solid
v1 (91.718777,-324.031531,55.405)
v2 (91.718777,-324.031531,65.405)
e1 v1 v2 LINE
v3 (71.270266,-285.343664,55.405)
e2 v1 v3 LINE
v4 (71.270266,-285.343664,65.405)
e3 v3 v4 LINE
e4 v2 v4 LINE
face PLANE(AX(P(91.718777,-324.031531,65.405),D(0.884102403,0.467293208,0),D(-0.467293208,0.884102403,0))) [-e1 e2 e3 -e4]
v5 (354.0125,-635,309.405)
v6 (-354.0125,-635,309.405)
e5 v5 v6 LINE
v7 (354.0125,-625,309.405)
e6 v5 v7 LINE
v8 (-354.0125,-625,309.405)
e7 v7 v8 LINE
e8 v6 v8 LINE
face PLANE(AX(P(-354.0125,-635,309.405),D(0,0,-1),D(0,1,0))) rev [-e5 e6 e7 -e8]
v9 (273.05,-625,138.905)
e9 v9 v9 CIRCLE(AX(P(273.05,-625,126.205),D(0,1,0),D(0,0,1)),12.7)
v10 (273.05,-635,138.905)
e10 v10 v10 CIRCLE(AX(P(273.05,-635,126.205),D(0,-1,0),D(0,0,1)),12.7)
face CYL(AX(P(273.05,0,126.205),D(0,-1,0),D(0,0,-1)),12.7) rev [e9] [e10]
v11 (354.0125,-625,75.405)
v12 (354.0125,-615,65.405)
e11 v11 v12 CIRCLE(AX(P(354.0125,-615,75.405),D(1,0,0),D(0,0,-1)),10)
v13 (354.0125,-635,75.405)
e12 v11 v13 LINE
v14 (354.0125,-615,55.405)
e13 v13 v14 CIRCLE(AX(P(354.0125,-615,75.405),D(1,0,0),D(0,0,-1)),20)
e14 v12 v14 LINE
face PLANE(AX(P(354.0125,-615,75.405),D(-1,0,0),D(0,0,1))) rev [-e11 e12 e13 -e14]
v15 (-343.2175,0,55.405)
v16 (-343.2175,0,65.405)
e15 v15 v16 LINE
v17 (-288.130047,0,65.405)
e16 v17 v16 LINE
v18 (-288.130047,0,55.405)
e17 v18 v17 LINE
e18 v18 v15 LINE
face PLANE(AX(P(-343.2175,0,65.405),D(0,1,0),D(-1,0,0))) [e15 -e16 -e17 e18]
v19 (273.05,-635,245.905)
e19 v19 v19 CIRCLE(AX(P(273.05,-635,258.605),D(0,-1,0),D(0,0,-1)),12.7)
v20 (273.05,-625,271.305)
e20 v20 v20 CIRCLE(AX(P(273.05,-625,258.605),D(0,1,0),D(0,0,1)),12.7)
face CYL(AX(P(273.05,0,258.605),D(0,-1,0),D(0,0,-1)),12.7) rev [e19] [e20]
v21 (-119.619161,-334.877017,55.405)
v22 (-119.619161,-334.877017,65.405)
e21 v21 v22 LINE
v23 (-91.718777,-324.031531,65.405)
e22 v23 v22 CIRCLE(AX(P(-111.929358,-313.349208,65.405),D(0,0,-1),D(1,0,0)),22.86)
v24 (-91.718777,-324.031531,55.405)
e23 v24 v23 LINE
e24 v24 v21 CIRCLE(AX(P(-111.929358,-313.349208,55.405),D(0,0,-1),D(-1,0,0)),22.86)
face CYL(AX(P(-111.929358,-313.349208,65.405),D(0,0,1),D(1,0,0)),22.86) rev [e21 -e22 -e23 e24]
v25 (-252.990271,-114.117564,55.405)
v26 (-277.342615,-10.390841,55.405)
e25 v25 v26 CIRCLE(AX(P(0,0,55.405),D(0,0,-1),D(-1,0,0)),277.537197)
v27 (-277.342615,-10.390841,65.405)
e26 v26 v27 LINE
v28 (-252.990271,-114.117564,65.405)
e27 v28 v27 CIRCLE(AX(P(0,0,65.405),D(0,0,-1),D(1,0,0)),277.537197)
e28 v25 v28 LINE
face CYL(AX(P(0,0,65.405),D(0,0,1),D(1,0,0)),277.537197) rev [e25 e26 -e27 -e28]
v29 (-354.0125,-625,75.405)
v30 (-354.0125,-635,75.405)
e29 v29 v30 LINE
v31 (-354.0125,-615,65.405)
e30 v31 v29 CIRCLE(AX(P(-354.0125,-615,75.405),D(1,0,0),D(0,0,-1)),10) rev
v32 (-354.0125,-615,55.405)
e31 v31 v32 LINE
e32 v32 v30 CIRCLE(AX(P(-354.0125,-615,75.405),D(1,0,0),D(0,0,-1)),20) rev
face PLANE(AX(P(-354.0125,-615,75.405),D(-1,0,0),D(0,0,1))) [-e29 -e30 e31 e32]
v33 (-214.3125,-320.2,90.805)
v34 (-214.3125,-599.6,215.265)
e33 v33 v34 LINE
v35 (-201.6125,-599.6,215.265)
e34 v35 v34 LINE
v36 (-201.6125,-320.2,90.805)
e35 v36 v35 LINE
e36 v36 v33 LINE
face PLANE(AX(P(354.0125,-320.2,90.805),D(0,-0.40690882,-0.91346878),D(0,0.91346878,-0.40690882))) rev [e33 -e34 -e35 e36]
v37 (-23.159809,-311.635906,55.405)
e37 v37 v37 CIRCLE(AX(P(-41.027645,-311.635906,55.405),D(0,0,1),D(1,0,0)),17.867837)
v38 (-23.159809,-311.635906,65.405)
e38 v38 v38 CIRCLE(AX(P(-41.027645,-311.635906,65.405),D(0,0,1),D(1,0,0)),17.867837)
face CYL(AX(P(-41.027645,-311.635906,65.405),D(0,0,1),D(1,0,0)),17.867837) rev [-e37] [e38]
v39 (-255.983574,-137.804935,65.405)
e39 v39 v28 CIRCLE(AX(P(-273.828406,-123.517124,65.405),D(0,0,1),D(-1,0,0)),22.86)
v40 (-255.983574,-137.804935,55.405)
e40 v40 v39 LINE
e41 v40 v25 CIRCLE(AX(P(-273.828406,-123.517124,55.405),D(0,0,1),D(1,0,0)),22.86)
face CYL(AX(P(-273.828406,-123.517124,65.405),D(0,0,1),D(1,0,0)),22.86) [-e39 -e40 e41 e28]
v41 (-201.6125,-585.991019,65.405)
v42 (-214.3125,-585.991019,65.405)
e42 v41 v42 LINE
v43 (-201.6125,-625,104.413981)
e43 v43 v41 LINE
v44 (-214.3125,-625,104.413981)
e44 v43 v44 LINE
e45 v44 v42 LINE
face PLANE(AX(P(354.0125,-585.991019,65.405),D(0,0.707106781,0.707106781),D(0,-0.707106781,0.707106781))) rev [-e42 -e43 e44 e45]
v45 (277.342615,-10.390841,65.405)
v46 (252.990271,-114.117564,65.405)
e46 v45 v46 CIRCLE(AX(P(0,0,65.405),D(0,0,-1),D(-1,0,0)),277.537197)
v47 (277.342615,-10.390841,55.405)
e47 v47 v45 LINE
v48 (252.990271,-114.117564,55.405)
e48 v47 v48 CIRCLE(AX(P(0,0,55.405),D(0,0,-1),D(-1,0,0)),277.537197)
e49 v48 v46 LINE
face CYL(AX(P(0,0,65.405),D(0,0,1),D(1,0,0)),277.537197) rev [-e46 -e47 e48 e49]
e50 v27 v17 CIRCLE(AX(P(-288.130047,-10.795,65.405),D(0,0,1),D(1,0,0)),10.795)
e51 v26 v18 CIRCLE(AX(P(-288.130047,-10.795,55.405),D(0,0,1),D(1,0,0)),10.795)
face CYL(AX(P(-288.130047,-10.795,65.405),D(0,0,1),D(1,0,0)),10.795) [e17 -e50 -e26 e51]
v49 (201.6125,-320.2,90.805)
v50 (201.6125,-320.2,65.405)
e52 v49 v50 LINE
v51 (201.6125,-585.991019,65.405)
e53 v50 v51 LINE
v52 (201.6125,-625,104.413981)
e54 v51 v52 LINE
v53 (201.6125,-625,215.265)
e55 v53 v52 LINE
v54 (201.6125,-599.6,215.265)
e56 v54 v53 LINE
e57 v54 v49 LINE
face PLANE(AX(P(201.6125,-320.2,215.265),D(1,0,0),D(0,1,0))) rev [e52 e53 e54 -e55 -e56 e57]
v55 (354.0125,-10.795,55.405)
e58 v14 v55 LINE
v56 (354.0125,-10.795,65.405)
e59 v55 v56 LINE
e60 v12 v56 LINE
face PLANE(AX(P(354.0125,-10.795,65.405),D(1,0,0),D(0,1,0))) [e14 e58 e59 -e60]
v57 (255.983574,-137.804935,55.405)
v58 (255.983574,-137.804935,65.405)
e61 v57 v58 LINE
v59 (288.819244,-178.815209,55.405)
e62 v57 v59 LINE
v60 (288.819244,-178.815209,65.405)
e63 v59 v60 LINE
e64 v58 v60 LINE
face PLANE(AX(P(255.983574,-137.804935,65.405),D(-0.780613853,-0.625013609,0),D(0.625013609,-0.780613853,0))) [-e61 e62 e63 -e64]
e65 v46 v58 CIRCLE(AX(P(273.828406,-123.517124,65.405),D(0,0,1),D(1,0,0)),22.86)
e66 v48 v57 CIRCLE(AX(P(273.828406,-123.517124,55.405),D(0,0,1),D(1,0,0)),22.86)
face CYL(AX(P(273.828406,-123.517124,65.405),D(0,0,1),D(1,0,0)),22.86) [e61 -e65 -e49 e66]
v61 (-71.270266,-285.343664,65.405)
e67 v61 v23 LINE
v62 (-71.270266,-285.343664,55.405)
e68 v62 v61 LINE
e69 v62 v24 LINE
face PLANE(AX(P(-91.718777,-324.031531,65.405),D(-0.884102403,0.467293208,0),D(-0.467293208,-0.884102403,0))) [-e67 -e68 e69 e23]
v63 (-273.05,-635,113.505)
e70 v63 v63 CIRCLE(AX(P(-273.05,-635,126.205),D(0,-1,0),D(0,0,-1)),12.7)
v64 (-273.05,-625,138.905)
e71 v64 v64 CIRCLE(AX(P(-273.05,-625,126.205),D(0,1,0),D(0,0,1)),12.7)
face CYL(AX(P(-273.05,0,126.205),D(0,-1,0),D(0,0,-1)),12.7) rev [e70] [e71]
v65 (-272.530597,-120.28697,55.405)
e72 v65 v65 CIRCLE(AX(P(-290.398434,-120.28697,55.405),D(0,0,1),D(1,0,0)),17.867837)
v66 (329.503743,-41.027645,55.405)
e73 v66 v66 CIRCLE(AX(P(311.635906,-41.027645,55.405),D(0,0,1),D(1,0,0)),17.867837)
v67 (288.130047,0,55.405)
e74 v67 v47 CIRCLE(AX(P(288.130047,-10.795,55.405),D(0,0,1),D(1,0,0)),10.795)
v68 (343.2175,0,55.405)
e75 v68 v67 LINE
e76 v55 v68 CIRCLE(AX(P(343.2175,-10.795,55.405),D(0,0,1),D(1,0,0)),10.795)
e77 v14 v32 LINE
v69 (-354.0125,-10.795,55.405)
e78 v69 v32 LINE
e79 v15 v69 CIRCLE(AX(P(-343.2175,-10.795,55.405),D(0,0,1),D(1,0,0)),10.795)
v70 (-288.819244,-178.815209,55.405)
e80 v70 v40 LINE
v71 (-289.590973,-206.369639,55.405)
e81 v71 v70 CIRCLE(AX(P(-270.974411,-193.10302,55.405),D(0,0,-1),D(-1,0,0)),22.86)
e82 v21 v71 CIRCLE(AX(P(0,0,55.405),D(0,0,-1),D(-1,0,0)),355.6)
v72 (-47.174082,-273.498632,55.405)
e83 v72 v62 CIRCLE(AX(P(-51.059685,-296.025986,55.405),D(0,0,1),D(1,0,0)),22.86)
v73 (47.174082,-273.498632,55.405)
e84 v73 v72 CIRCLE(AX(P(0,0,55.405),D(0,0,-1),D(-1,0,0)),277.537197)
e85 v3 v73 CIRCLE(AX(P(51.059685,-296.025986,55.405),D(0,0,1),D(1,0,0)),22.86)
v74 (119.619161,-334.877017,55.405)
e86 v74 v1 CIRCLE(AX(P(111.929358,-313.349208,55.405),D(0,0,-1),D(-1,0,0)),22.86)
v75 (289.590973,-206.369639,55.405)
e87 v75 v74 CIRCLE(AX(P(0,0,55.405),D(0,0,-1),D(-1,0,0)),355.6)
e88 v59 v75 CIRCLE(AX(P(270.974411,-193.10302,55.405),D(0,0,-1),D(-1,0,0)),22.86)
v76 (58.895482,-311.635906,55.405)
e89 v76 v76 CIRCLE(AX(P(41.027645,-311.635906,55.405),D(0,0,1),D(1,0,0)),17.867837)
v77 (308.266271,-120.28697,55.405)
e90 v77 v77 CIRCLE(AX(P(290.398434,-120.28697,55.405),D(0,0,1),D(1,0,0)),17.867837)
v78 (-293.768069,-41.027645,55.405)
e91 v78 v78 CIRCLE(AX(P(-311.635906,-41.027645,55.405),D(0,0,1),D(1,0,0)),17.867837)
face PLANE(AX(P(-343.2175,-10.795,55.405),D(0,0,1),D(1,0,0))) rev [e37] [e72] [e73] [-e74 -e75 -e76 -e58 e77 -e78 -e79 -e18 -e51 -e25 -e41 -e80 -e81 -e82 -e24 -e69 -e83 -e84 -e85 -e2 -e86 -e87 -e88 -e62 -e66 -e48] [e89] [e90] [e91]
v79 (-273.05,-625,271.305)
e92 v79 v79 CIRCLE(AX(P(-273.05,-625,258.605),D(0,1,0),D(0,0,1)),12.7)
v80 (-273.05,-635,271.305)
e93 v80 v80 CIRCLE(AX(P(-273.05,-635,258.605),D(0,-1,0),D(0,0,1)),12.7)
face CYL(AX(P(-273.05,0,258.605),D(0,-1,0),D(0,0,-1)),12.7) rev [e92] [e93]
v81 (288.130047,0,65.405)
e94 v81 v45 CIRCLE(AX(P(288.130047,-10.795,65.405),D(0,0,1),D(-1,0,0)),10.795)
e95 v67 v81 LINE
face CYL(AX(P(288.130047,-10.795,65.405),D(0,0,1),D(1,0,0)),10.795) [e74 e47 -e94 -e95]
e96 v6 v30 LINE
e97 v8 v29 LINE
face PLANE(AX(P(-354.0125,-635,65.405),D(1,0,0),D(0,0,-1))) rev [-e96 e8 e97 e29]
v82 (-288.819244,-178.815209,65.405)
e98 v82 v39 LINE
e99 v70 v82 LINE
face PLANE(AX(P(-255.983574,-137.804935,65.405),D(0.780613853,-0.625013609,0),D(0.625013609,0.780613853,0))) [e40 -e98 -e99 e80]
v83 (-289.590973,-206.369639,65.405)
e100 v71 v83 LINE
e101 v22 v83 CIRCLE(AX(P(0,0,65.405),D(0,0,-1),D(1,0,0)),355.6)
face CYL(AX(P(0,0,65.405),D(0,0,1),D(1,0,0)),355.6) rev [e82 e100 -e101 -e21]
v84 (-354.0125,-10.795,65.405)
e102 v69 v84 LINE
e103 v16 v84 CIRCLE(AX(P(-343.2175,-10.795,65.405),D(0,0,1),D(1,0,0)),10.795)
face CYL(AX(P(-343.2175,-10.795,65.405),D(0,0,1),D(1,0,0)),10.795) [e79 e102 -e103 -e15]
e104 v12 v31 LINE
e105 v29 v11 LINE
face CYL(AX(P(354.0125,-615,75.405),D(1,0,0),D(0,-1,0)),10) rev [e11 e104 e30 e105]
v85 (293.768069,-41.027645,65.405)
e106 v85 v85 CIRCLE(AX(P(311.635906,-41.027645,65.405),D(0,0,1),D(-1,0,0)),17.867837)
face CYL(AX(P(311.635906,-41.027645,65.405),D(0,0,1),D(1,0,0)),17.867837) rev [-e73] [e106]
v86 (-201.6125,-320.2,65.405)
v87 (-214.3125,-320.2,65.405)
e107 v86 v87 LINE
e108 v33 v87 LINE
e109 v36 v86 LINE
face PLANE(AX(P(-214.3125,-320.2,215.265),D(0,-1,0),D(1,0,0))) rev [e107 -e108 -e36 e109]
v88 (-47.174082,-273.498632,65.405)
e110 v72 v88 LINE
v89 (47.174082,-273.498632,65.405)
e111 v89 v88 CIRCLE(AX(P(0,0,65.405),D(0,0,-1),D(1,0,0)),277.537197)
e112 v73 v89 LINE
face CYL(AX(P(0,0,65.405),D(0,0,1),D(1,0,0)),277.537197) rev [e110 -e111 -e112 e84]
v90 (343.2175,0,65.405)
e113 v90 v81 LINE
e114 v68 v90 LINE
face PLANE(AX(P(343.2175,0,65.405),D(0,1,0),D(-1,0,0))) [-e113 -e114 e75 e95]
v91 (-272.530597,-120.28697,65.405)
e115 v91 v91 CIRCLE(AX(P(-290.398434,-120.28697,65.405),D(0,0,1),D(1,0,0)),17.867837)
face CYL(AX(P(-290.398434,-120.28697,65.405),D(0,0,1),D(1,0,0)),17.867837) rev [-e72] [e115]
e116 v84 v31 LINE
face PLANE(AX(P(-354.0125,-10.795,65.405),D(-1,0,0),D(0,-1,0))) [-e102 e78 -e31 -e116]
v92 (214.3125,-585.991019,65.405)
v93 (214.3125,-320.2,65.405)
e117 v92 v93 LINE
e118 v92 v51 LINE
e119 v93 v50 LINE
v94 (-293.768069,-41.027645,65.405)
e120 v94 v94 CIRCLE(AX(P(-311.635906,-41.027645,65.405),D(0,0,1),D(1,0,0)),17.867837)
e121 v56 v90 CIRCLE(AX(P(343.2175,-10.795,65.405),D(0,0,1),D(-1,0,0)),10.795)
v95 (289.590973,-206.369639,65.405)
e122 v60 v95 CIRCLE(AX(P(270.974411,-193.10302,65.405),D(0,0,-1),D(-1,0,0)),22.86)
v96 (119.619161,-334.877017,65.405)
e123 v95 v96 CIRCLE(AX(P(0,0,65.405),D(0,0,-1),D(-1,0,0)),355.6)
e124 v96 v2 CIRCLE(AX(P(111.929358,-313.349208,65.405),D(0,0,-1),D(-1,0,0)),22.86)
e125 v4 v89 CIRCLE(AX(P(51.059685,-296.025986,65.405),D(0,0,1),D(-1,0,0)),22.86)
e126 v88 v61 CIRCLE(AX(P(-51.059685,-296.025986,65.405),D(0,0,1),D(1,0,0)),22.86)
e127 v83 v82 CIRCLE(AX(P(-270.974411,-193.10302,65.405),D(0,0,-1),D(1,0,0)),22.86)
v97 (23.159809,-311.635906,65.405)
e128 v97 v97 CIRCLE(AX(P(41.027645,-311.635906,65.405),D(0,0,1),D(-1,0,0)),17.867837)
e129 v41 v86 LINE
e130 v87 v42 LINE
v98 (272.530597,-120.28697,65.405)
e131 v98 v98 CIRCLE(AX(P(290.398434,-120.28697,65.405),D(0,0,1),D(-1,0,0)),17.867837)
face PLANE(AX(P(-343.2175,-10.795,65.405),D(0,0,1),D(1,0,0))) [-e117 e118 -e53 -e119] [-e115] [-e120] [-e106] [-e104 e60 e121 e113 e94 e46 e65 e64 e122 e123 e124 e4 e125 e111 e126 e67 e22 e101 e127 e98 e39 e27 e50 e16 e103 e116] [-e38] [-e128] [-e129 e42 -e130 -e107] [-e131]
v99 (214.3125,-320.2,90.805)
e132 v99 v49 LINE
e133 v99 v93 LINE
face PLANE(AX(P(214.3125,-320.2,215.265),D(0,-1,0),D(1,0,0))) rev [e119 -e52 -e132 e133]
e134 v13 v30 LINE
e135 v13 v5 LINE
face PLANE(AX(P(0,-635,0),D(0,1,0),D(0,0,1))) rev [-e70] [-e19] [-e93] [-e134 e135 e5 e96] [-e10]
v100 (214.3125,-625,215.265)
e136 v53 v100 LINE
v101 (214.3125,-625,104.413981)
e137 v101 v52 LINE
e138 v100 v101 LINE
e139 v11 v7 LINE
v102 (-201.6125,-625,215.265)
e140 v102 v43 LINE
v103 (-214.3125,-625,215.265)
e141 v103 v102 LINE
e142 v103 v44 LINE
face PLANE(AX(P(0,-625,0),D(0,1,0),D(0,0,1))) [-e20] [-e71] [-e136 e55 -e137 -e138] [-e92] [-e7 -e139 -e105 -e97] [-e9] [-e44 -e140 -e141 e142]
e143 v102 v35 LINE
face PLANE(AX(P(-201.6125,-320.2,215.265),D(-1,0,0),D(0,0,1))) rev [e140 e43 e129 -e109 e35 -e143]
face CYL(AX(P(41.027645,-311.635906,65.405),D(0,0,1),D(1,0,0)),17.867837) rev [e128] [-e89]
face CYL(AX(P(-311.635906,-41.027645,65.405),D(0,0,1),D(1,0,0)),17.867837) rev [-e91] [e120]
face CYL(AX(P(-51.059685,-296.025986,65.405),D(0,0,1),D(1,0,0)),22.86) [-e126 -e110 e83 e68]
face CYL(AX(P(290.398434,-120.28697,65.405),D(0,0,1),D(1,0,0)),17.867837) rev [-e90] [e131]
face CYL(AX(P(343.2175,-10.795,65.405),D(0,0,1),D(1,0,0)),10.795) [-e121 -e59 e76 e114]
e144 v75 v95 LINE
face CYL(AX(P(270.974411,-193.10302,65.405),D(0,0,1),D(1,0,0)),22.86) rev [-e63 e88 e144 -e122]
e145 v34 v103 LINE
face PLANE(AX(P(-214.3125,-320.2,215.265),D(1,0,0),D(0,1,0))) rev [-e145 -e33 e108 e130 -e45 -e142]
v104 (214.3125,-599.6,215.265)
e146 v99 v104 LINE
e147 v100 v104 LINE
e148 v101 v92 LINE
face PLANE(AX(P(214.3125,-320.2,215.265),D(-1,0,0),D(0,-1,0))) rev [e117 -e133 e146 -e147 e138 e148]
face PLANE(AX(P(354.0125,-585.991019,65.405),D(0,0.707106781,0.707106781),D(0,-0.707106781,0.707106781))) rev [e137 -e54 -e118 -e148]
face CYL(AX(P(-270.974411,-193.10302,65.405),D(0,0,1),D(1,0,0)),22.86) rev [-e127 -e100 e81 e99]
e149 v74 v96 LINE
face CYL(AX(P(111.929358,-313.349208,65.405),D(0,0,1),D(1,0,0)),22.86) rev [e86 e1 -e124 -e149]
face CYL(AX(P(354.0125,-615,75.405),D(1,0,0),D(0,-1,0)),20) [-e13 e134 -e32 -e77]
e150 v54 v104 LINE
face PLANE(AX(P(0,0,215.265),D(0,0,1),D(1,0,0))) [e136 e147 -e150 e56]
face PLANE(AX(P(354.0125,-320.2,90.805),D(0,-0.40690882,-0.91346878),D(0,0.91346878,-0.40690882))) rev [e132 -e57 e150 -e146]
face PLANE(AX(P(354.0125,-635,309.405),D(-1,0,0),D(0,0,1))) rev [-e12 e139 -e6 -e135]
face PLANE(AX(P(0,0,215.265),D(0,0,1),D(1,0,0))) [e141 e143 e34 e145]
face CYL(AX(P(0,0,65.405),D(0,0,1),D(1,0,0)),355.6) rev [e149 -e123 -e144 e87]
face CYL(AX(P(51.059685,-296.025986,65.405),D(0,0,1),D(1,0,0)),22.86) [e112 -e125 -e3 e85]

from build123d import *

# Parameters (mm, degrees)
SKETCH1_R                    = 355.6
BOSS_EXTRUDE1_DEPTH          = 60.325
SKETCH2_R                    = 17.4625
BOLTHOLE_DEPTH               = 507.499581071
BOLTHOLEPATTERN_COUNT        = 24
SKETCH5_OUTSIDE_W            = 914.72
SKETCH5_OUTSIDE_H            = 914.72
SKETCH5_OUTSIDE_R            = 266.7
RAISED_FACE_DEPTH            = 1.5875
FILLET2_R                    = 1.5875
FILLET3_R                    = 1.5875
SKETCH11_R                   = 230.886
CUT_EXTRUDE5_DEPTH           = 507.499581211
SKETCH12_R                   = 17.867836571
BOSS_EXTRUDE2_DEPTH          = 5.08
CONVERT_SOLID1_OUTLINE_R     = 355.6
CONVERT_SOLID1_OUTLINE_R_2   = 17.4625
CONVERT_SOLID1_OUTLINE_R_3   = 230.886
CONVERT_SOLID1_DEPTH         = 55.405
CONVERT_SOLID1_START         = 55.405
CONVERT_SOLID1_2_OUTLINE_R   = 17.4625
CONVERT_SOLID1_2_OUTLINE_R_2 = 230.886
CONVERT_SOLID1_2_OUTLINE_R_3 = 17.867836571
CONVERT_SOLID1_2_DEPTH       = 4.92
CONVERT_SOLID1_3_OUTLINE_R   = 17.867836571
CONVERT_SOLID1_3_DEPTH       = 4.92
EDGE_FLANGE1_STRIP_W         = 60
EDGE_FLANGE1_STRIP_H         = 10
EDGE_FLANGE1_STRIP_CUT_DEPTH = 708.025
EDGE_FLANGE1_DEPTH           = 708.025
SKETCH21_R                   = 12.7
CUT_EXTRUDE6_DEPTH           = 791.114741274
SKETCH22_W                   = 12.7
SKETCH22_H                   = 304.8
BOSS_EXTRUDE3_DEPTH          = 149.86
CUT_EXTRUDE12_DEPTH          = 907.614449346


# Read off the part's stored shape, not the designer's step: Convert-Solid1
# Sheet-metal steps are written as plain solids
with BuildPart() as part:
    # Sketch1 → Boss-Extrude1 (new body)
    with BuildSketch(Plane.XY):
        with Locations(Location((0, 0, 0), (0, 0, 180))):
            Circle(SKETCH1_R)
    extrude(amount=BOSS_EXTRUDE1_DEPTH)

    # Sketch2 → BoltHole (cut, through all)
    with BuildSketch(Plane.XY):
        with Locations(Location((41.02764537, 311.635906051, 0), (0, 0, 180))):
            Circle(SKETCH2_R)
    bolthole = extrude(amount=BOLTHOLE_DEPTH, mode=Mode.SUBTRACT)

    # BoltHolePattern: BoltHole ×24 about axis
    boltholepattern_axis = Axis((0, 0, 0), (0, 0, 1))
    for i in range(1, BOLTHOLEPATTERN_COUNT):
        add(bolthole.rotate(boltholepattern_axis, i * 360 / BOLTHOLEPATTERN_COUNT), mode=Mode.SUBTRACT)

    # Sketch5 outside → Raised Face (cut)
    with BuildSketch(Plane(origin=(0, 0, 0), x_dir=(-1, 0, 0), z_dir=(0, 0, -1))):
        Rectangle(SKETCH5_OUTSIDE_W, SKETCH5_OUTSIDE_H)
        Circle(SKETCH5_OUTSIDE_R, mode=Mode.SUBTRACT)
    extrude(amount=-RAISED_FACE_DEPTH, mode=Mode.SUBTRACT)

    # Fillet2
    fillet2_edges = [part.edges().sort_by_distance(p)[0] for p in [
        (355.6, 0, 1.5875),
        (355.6, 0, 60.325),
    ]]
    fillet(fillet2_edges, radius=FILLET2_R)

    # Fillet3
    fillet3_edges = [part.edges().sort_by_distance(p)[0] for p in [
        (266.7, 0, 1.5875),
    ]]
    fillet(fillet3_edges, radius=FILLET3_R - 0.0001)  # a hair under: the kernel refuses the full size

    # Sketch11 → Cut-Extrude5 (cut, through all)
    with BuildSketch(Plane.XY):
        with Locations(Location((0, 0, 0), (0, 0, 180))):
            Circle(SKETCH11_R)
    extrude(amount=CUT_EXTRUDE5_DEPTH, mode=Mode.SUBTRACT)

    # Sketch12 → Boss-Extrude2 (add)
    with BuildSketch(Plane.XY.offset(60.325)):
        with BuildLine():
            Line((-343.2175, 0), (-288.130046772, 0))
            ThreePointArc((-288.130046772, 0), (-280.641083905, -3.020203528), (-277.342615169, -10.390841095))
            ThreePointArc((-277.342615169, -10.390841095), (-270.190767513, -63.433783731), (-252.99027113, -114.117564297))
            ThreePointArc((-252.99027113, -114.117564297), (-251.148770275, -126.38308213), (-255.983573502, -137.804935346))
            Line((-255.983573502, -137.804935346), (-288.819243573, -178.81520867))
            ThreePointArc((-288.819243573, -178.81520867), (-293.825450252, -192.463019981), (-289.590973462, -206.369639456))
            ThreePointArc((-289.590973462, -206.369639456), (-214.456918936, -283.653996835), (-119.619161223, -334.877016632))
            ThreePointArc((-119.619161223, -334.877016632), (-103.646930374, -334.656038137), (-91.71877708, -324.031531146))
            Line((-91.71877708, -324.031531146), (-71.270266052, -285.343663587))
            ThreePointArc((-71.270266052, -285.343663587), (-61.144446621, -275.510694804), (-47.174081625, -273.498632154))
            ThreePointArc((-47.174081625, -273.498632154), (0, -277.537197088), (47.174081625, -273.498632154))
            ThreePointArc((47.174081625, -273.498632154), (61.144446621, -275.510694804), (71.270266052, -285.343663587))
            Line((71.270266052, -285.343663587), (91.71877708, -324.031531146))
            ThreePointArc((91.71877708, -324.031531146), (103.646930374, -334.656038137), (119.619161223, -334.877016632))
            ThreePointArc((119.619161223, -334.877016632), (214.456918936, -283.653996835), (289.590973462, -206.369639456))
            ThreePointArc((289.590973462, -206.369639456), (293.825450252, -192.463019981), (288.819243573, -178.81520867))
            Line((288.819243573, -178.81520867), (255.983573502, -137.804935346))
            ThreePointArc((255.983573502, -137.804935346), (251.148770275, -126.38308213), (252.99027113, -114.117564297))
            ThreePointArc((252.99027113, -114.117564297), (270.190767513, -63.433783731), (277.342615169, -10.390841095))
            ThreePointArc((277.342615169, -10.390841095), (280.641083905, -3.020203528), (288.130046772, 0))
            Line((288.130046772, 0), (343.2175, 0))
            ThreePointArc((343.2175, 0), (350.850717703, -3.161782297), (354.0125, -10.795))
            Line((354.0125, -10.795), (354.0125, -635))
            Line((354.0125, -635), (-354.0125, -635))
            Line((-354.0125, -635), (-354.0125, -10.795))
            ThreePointArc((-354.0125, -10.795), (-350.850717703, -3.161782297), (-343.2175, 0))
        make_face()
        with Locations((-311.635906051, -41.02764537)):
            Circle(SKETCH12_R, mode=Mode.SUBTRACT)
        with Locations((-290.398434057, -120.286969878)):
            Circle(SKETCH12_R, mode=Mode.SUBTRACT)
        with Locations((-41.02764537, -311.635906051)):
            Circle(SKETCH12_R, mode=Mode.SUBTRACT)
        with Locations(Location((41.02764537, -311.635906051, 0), (0, 0, 180))):
            Circle(SKETCH12_R, mode=Mode.SUBTRACT)
        with Locations(Location((290.398434057, -120.286969878, 0), (0, 0, 180))):
            Circle(SKETCH12_R, mode=Mode.SUBTRACT)
        with Locations(Location((311.635906051, -41.02764537, 0), (0, 0, 180))):
            Circle(SKETCH12_R, mode=Mode.SUBTRACT)
    extrude(amount=BOSS_EXTRUDE2_DEPTH)

    # Convert-Solid1 outline → Convert-Solid1 (cut)
    with BuildSketch(Plane.XY):
        Circle(CONVERT_SOLID1_OUTLINE_R)
        with Locations((-41.02764537, 311.635906051)):
            Circle(CONVERT_SOLID1_OUTLINE_R_2, mode=Mode.SUBTRACT)
        Circle(CONVERT_SOLID1_OUTLINE_R_3, mode=Mode.SUBTRACT)
        with Locations((311.635906051, 41.02764537)):
            Circle(CONVERT_SOLID1_OUTLINE_R_2, mode=Mode.SUBTRACT)
        with Locations((41.02764537, 311.635906051)):
            Circle(CONVERT_SOLID1_OUTLINE_R_2, mode=Mode.SUBTRACT)
        with Locations((120.286969878, 290.398434057)):
            Circle(CONVERT_SOLID1_OUTLINE_R_2, mode=Mode.SUBTRACT)
        with Locations((249.370788687, 191.348936173)):
            Circle(CONVERT_SOLID1_OUTLINE_R_2, mode=Mode.SUBTRACT)
        with Locations((290.398434057, 120.286969878)):
            Circle(CONVERT_SOLID1_OUTLINE_R_2, mode=Mode.SUBTRACT)
        with Locations((191.348936173, 249.370788687)):
            Circle(CONVERT_SOLID1_OUTLINE_R_2, mode=Mode.SUBTRACT)
        with Locations((-191.348936173, -249.370788687)):
            Circle(CONVERT_SOLID1_OUTLINE_R_2, mode=Mode.SUBTRACT)
        with Locations((-249.370788687, -191.348936173)):
            Circle(CONVERT_SOLID1_OUTLINE_R_2, mode=Mode.SUBTRACT)
        with Locations((-120.286969878, -290.398434057)):
            Circle(CONVERT_SOLID1_OUTLINE_R_2, mode=Mode.SUBTRACT)
        with Locations((120.286969878, -290.398434057)):
            Circle(CONVERT_SOLID1_OUTLINE_R_2, mode=Mode.SUBTRACT)
        with Locations((191.348936173, -249.370788687)):
            Circle(CONVERT_SOLID1_OUTLINE_R_2, mode=Mode.SUBTRACT)
        with Locations((249.370788687, -191.348936173)):
            Circle(CONVERT_SOLID1_OUTLINE_R_2, mode=Mode.SUBTRACT)
        with Locations((-311.635906051, 41.02764537)):
            Circle(CONVERT_SOLID1_OUTLINE_R_2, mode=Mode.SUBTRACT)
        with Locations((-290.398434057, 120.286969878)):
            Circle(CONVERT_SOLID1_OUTLINE_R_2, mode=Mode.SUBTRACT)
        with Locations((-249.370788687, 191.348936173)):
            Circle(CONVERT_SOLID1_OUTLINE_R_2, mode=Mode.SUBTRACT)
        with Locations((-191.348936173, 249.370788687)):
            Circle(CONVERT_SOLID1_OUTLINE_R_2, mode=Mode.SUBTRACT)
        with Locations((-120.286969878, 290.398434057)):
            Circle(CONVERT_SOLID1_OUTLINE_R_2, mode=Mode.SUBTRACT)
        with Locations((290.398434057, -120.286969878)):
            Circle(CONVERT_SOLID1_OUTLINE_R_2, mode=Mode.SUBTRACT)
        with Locations((311.635906051, -41.02764537)):
            Circle(CONVERT_SOLID1_OUTLINE_R_2, mode=Mode.SUBTRACT)
        with Locations((41.02764537, -311.635906051)):
            Circle(CONVERT_SOLID1_OUTLINE_R_2, mode=Mode.SUBTRACT)
        with Locations((-41.02764537, -311.635906051)):
            Circle(CONVERT_SOLID1_OUTLINE_R_2, mode=Mode.SUBTRACT)
        with Locations((-290.398434057, -120.286969878)):
            Circle(CONVERT_SOLID1_OUTLINE_R_2, mode=Mode.SUBTRACT)
        with Locations((-311.635906051, -41.02764537)):
            Circle(CONVERT_SOLID1_OUTLINE_R_2, mode=Mode.SUBTRACT)
    extrude(amount=CONVERT_SOLID1_DEPTH, mode=Mode.SUBTRACT)

    # Convert-Solid1 2 outline → Convert-Solid1 2 (cut)
    # profile 1 of 7: a face of its own
    with BuildSketch(Plane.XY.offset(CONVERT_SOLID1_START)):
        with BuildLine():
            Line((288.130046772, 0), (343.2175, 0))
            ThreePointArc((343.2175, 0), (350.850717703, -3.161782297), (354.0125, -10.795))
            Line((354.0125, -10.795), (354.0125, -33.563519538))
            ThreePointArc((354.0125, -33.563519538), (0, 355.6), (-354.0125, -33.563519538))
            Line((-354.0125, -33.563519538), (-354.0125, -10.795))
            ThreePointArc((-354.0125, -10.795), (-350.850717703, -3.161782297), (-343.2175, 0))
            Line((-343.2175, 0), (-288.130046772, 0))
            ThreePointArc((-288.130046772, 0), (-280.641083906, -3.020203527), (-277.342615169, -10.390841095))
            ThreePointArc((-277.342615169, -10.390841095), (-270.190767513, -63.433783731), (-252.99027113, -114.117564297))
            ThreePointArc((-252.99027113, -114.117564297), (-251.148770275, -126.38308213), (-255.983573502, -137.804935346))
            Line((-255.983573502, -137.804935346), (-288.819243573, -178.81520867))
            ThreePointArc((-288.819243573, -178.81520867), (-293.825450252, -192.463019981), (-289.590973462, -206.369639456))
            ThreePointArc((-289.590973462, -206.369639456), (-214.456918936, -283.653996835), (-119.619161223, -334.877016632))
            ThreePointArc((-119.619161223, -334.877016632), (-103.646930374, -334.656038137), (-91.71877708, -324.031531146))
            Line((-91.71877708, -324.031531146), (-71.270266052, -285.343663587))
            ThreePointArc((-71.270266052, -285.343663587), (-61.144446621, -275.510694804), (-47.174081625, -273.498632154))
            ThreePointArc((-47.174081625, -273.498632154), (0, -277.537197088), (47.174081625, -273.498632154))
            ThreePointArc((47.174081625, -273.498632154), (61.144446621, -275.510694804), (71.270266052, -285.343663587))
            Line((71.270266052, -285.343663587), (91.71877708, -324.031531146))
            ThreePointArc((91.71877708, -324.031531146), (103.646930374, -334.656038137), (119.619161223, -334.877016632))
            ThreePointArc((119.619161223, -334.877016632), (214.456918936, -283.653996835), (289.590973462, -206.369639456))
            ThreePointArc((289.590973462, -206.369639456), (293.825450252, -192.463019981), (288.819243573, -178.81520867))
            Line((288.819243573, -178.81520867), (255.983573502, -137.804935346))
            ThreePointArc((255.983573502, -137.804935346), (251.148770275, -126.38308213), (252.99027113, -114.117564297))
            ThreePointArc((252.99027113, -114.117564297), (270.190767513, -63.433783731), (277.342615169, -10.390841095))
            ThreePointArc((277.342615169, -10.390841095), (280.641083906, -3.020203527), (288.130046772, 0))
        make_face()
        with Locations((-191.348936173, -249.370788687)):
            Circle(CONVERT_SOLID1_2_OUTLINE_R, mode=Mode.SUBTRACT)
        with Locations((-249.370788687, -191.348936173)):
            Circle(CONVERT_SOLID1_2_OUTLINE_R, mode=Mode.SUBTRACT)
        with Locations((-120.286969878, -290.398434057)):
            Circle(CONVERT_SOLID1_2_OUTLINE_R, mode=Mode.SUBTRACT)
        with Locations((120.286969878, -290.398434057)):
            Circle(CONVERT_SOLID1_2_OUTLINE_R, mode=Mode.SUBTRACT)
        with Locations((191.348936173, -249.370788687)):
            Circle(CONVERT_SOLID1_2_OUTLINE_R, mode=Mode.SUBTRACT)
        with Locations((249.370788687, -191.348936173)):
            Circle(CONVERT_SOLID1_2_OUTLINE_R, mode=Mode.SUBTRACT)
        with Locations((-311.635906051, 41.02764537)):
            Circle(CONVERT_SOLID1_2_OUTLINE_R, mode=Mode.SUBTRACT)
        with Locations((-290.398434057, 120.286969878)):
            Circle(CONVERT_SOLID1_2_OUTLINE_R, mode=Mode.SUBTRACT)
        with Locations((-249.370788687, 191.348936173)):
            Circle(CONVERT_SOLID1_2_OUTLINE_R, mode=Mode.SUBTRACT)
        with Locations((-191.348936173, 249.370788687)):
            Circle(CONVERT_SOLID1_2_OUTLINE_R, mode=Mode.SUBTRACT)
        with Locations((-120.286969878, 290.398434057)):
            Circle(CONVERT_SOLID1_2_OUTLINE_R, mode=Mode.SUBTRACT)
        with Locations((-41.02764537, 311.635906051)):
            Circle(CONVERT_SOLID1_2_OUTLINE_R, mode=Mode.SUBTRACT)
        Circle(CONVERT_SOLID1_2_OUTLINE_R_2, mode=Mode.SUBTRACT)
        with Locations((311.635906051, 41.02764537)):
            Circle(CONVERT_SOLID1_2_OUTLINE_R, mode=Mode.SUBTRACT)
        with Locations((41.02764537, 311.635906051)):
            Circle(CONVERT_SOLID1_2_OUTLINE_R, mode=Mode.SUBTRACT)
        with Locations((120.286969878, 290.398434057)):
            Circle(CONVERT_SOLID1_2_OUTLINE_R, mode=Mode.SUBTRACT)
        with Locations((249.370788687, 191.348936173)):
            Circle(CONVERT_SOLID1_2_OUTLINE_R, mode=Mode.SUBTRACT)
        with Locations((290.398434057, 120.286969878)):
            Circle(CONVERT_SOLID1_2_OUTLINE_R, mode=Mode.SUBTRACT)
        with Locations((191.348936173, 249.370788687)):
            Circle(CONVERT_SOLID1_2_OUTLINE_R, mode=Mode.SUBTRACT)
    # profile 2 of 7: a face of its own
    with BuildSketch(Plane.XY.offset(CONVERT_SOLID1_START)):
        with Locations((290.398434057, -120.286969878)):
            Circle(CONVERT_SOLID1_2_OUTLINE_R_3)
        with Locations((290.398434057, -120.286969878)):
            Circle(CONVERT_SOLID1_2_OUTLINE_R, mode=Mode.SUBTRACT)
    # profile 3 of 7: a face of its own
    with BuildSketch(Plane.XY.offset(CONVERT_SOLID1_START)):
        with Locations((-41.02764537, -311.635906051)):
            Circle(CONVERT_SOLID1_2_OUTLINE_R_3)
        with Locations((-41.02764537, -311.635906051)):
            Circle(CONVERT_SOLID1_2_OUTLINE_R, mode=Mode.SUBTRACT)
    # profile 4 of 7: a face of its own
    with BuildSketch(Plane.XY.offset(CONVERT_SOLID1_START)):
        with Locations((-311.635906051, -41.02764537)):
            Circle(CONVERT_SOLID1_2_OUTLINE_R_3)
        with Locations((-311.635906051, -41.02764537)):
            Circle(CONVERT_SOLID1_2_OUTLINE_R, mode=Mode.SUBTRACT)
    # profile 5 of 7: a face of its own
    with BuildSketch(Plane.XY.offset(CONVERT_SOLID1_START)):
        with Locations((-290.398434057, -120.286969878)):
            Circle(CONVERT_SOLID1_2_OUTLINE_R_3)
        with Locations((-290.398434057, -120.286969878)):
            Circle(CONVERT_SOLID1_2_OUTLINE_R, mode=Mode.SUBTRACT)
    # profile 6 of 7: a face of its own
    with BuildSketch(Plane.XY.offset(CONVERT_SOLID1_START)):
        with Locations((41.02764537, -311.635906051)):
            Circle(CONVERT_SOLID1_2_OUTLINE_R_3)
        with Locations((41.02764537, -311.635906051)):
            Circle(CONVERT_SOLID1_2_OUTLINE_R, mode=Mode.SUBTRACT)
    # profile 7 of 7: a face of its own
    with BuildSketch(Plane.XY.offset(CONVERT_SOLID1_START)):
        with Locations((311.635906051, -41.02764537)):
            Circle(CONVERT_SOLID1_2_OUTLINE_R_3)
        with Locations((311.635906051, -41.02764537)):
            Circle(CONVERT_SOLID1_2_OUTLINE_R, mode=Mode.SUBTRACT)
    extrude(amount=CONVERT_SOLID1_2_DEPTH, mode=Mode.SUBTRACT)

    # Convert-Solid1 3 outline → Convert-Solid1 3 (add)
    with BuildSketch(Plane.XY.offset(CONVERT_SOLID1_START)):
        with BuildLine():
            ThreePointArc((354.0125, -10.795), (350.850717703, -3.161782297), (343.2175, 0))
            Line((343.2175, 0), (288.130046772, 0))
            ThreePointArc((288.130046772, 0), (280.641083906, -3.020203527), (277.342615169, -10.390841095))
            ThreePointArc((277.342615169, -10.390841095), (270.190767513, -63.433783731), (252.99027113, -114.117564297))
            ThreePointArc((252.99027113, -114.117564297), (251.148770275, -126.38308213), (255.983573502, -137.804935346))
            Line((255.983573502, -137.804935346), (288.819243573, -178.81520867))
            ThreePointArc((288.819243573, -178.81520867), (293.825450252, -192.463019981), (289.590973462, -206.369639456))
            ThreePointArc((289.590973462, -206.369639456), (214.456918936, -283.653996835), (119.619161223, -334.877016632))
            ThreePointArc((119.619161223, -334.877016632), (103.646930374, -334.656038137), (91.71877708, -324.031531146))
            Line((91.71877708, -324.031531146), (71.270266052, -285.343663587))
            ThreePointArc((71.270266052, -285.343663587), (61.144446621, -275.510694804), (47.174081625, -273.498632154))
            ThreePointArc((47.174081625, -273.498632154), (0, -277.537197088), (-47.174081625, -273.498632154))
            ThreePointArc((-47.174081625, -273.498632154), (-61.144446621, -275.510694804), (-71.270266052, -285.343663587))
            Line((-71.270266052, -285.343663587), (-91.71877708, -324.031531146))
            ThreePointArc((-91.71877708, -324.031531146), (-103.646930374, -334.656038137), (-119.619161223, -334.877016632))
            ThreePointArc((-119.619161223, -334.877016632), (-214.456918936, -283.653996835), (-289.590973462, -206.369639456))
            ThreePointArc((-289.590973462, -206.369639456), (-293.825450252, -192.463019981), (-288.819243573, -178.81520867))
            Line((-288.819243573, -178.81520867), (-255.983573502, -137.804935346))
            ThreePointArc((-255.983573502, -137.804935346), (-251.148770275, -126.38308213), (-252.99027113, -114.117564297))
            ThreePointArc((-252.99027113, -114.117564297), (-270.190767513, -63.433783731), (-277.342615169, -10.390841095))
            ThreePointArc((-277.342615169, -10.390841095), (-280.641083906, -3.020203527), (-288.130046772, 0))
            Line((-288.130046772, 0), (-343.2175, 0))
            ThreePointArc((-343.2175, 0), (-350.850717703, -3.161782297), (-354.0125, -10.795))
            Line((-354.0125, -10.795), (-354.0125, -635))
            Line((-354.0125, -635), (354.0125, -635))
            Line((354.0125, -635), (354.0125, -10.795))
        make_face()
        with Locations((290.398434057, -120.286969878)):
            Circle(CONVERT_SOLID1_3_OUTLINE_R, mode=Mode.SUBTRACT)
        with Locations((311.635906051, -41.02764537)):
            Circle(CONVERT_SOLID1_3_OUTLINE_R, mode=Mode.SUBTRACT)
        with Locations((-311.635906051, -41.02764537)):
            Circle(CONVERT_SOLID1_3_OUTLINE_R, mode=Mode.SUBTRACT)
        with Locations((-290.398434057, -120.286969878)):
            Circle(CONVERT_SOLID1_3_OUTLINE_R, mode=Mode.SUBTRACT)
        with Locations((41.02764537, -311.635906051)):
            Circle(CONVERT_SOLID1_3_OUTLINE_R, mode=Mode.SUBTRACT)
        with Locations((-41.02764537, -311.635906051)):
            Circle(CONVERT_SOLID1_3_OUTLINE_R, mode=Mode.SUBTRACT)
    extrude(amount=CONVERT_SOLID1_3_DEPTH)

    # Edge-Flange1 strip (across the edge) → Edge-Flange1 strip cut (cut)
    with BuildSketch(Plane(origin=(-354.0125, -635, 65.405), x_dir=(0, 1, 0), z_dir=(1, 0, 0))):
        with Locations((-10, -5)):
            Rectangle(EDGE_FLANGE1_STRIP_W, EDGE_FLANGE1_STRIP_H)
    extrude(amount=EDGE_FLANGE1_STRIP_CUT_DEPTH, mode=Mode.SUBTRACT)

    # Edge-Flange1 section (across the edge) → Edge-Flange1 (add)
    with BuildSketch(Plane(origin=(-354.0125, -635, 65.405), x_dir=(0, 1, 0), z_dir=(1, 0, 0))):
        with BuildLine():
            Line((0, 10), (0, 244))
            Line((0, 244), (10, 244))
            Line((10, 244), (10, 10))
            ThreePointArc((10, 10), (12.928932188, 2.928932188), (20, 0))
            Line((20, 0), (20, -10))
            ThreePointArc((20, -10), (5.857864376, -4.142135624), (0, 10))
        make_face()
    extrude(amount=EDGE_FLANGE1_DEPTH)

    # Sketch21 → Cut-Extrude6 (cut, through all)
    with BuildSketch(Plane.XZ.offset(635)):
        with Locations(Location((273.05, 258.605, 0), (0, 0, 270))):
            Circle(SKETCH21_R)
        with Locations(Location((273.05, 126.205, 0), (0, 0, 90))):
            Circle(SKETCH21_R)
        with Locations(Location((-273.05, 126.205, 0), (0, 0, 270))):
            Circle(SKETCH21_R)
        with Locations(Location((-273.05, 258.605, 0), (0, 0, 90))):
            Circle(SKETCH21_R)
    extrude(amount=-CUT_EXTRUDE6_DEPTH, mode=Mode.SUBTRACT)

    # Sketch22 → Boss-Extrude3 (add)
    with BuildSketch(Plane.XY.offset(65.405)):
        with Locations((-207.9625, -472.6)):
            Rectangle(SKETCH22_W, SKETCH22_H)
        with Locations((207.9625, -472.6)):
            Rectangle(SKETCH22_W, SKETCH22_H)
    extrude(amount=BOSS_EXTRUDE3_DEPTH)

    # Sketch23 → Cut-Extrude12 (cut, through all)
    with BuildSketch(Plane.ZY.offset(214.3125)):
        with BuildLine():
            Line((65.405, -585.99101891), (104.41398109, -625))
            Line((104.41398109, -625), (75.405, -625))
            ThreePointArc((75.405, -625), (68.333932188, -622.071067812), (65.405, -615))
            Line((65.405, -615), (65.405, -585.99101891))
        make_face()
        Polygon((90.805, -320.2), (215.265, -599.6), (215.265, -320.2), align=None)
    extrude(amount=-CUT_EXTRUDE12_DEPTH, mode=Mode.SUBTRACT)


solid = part.part
